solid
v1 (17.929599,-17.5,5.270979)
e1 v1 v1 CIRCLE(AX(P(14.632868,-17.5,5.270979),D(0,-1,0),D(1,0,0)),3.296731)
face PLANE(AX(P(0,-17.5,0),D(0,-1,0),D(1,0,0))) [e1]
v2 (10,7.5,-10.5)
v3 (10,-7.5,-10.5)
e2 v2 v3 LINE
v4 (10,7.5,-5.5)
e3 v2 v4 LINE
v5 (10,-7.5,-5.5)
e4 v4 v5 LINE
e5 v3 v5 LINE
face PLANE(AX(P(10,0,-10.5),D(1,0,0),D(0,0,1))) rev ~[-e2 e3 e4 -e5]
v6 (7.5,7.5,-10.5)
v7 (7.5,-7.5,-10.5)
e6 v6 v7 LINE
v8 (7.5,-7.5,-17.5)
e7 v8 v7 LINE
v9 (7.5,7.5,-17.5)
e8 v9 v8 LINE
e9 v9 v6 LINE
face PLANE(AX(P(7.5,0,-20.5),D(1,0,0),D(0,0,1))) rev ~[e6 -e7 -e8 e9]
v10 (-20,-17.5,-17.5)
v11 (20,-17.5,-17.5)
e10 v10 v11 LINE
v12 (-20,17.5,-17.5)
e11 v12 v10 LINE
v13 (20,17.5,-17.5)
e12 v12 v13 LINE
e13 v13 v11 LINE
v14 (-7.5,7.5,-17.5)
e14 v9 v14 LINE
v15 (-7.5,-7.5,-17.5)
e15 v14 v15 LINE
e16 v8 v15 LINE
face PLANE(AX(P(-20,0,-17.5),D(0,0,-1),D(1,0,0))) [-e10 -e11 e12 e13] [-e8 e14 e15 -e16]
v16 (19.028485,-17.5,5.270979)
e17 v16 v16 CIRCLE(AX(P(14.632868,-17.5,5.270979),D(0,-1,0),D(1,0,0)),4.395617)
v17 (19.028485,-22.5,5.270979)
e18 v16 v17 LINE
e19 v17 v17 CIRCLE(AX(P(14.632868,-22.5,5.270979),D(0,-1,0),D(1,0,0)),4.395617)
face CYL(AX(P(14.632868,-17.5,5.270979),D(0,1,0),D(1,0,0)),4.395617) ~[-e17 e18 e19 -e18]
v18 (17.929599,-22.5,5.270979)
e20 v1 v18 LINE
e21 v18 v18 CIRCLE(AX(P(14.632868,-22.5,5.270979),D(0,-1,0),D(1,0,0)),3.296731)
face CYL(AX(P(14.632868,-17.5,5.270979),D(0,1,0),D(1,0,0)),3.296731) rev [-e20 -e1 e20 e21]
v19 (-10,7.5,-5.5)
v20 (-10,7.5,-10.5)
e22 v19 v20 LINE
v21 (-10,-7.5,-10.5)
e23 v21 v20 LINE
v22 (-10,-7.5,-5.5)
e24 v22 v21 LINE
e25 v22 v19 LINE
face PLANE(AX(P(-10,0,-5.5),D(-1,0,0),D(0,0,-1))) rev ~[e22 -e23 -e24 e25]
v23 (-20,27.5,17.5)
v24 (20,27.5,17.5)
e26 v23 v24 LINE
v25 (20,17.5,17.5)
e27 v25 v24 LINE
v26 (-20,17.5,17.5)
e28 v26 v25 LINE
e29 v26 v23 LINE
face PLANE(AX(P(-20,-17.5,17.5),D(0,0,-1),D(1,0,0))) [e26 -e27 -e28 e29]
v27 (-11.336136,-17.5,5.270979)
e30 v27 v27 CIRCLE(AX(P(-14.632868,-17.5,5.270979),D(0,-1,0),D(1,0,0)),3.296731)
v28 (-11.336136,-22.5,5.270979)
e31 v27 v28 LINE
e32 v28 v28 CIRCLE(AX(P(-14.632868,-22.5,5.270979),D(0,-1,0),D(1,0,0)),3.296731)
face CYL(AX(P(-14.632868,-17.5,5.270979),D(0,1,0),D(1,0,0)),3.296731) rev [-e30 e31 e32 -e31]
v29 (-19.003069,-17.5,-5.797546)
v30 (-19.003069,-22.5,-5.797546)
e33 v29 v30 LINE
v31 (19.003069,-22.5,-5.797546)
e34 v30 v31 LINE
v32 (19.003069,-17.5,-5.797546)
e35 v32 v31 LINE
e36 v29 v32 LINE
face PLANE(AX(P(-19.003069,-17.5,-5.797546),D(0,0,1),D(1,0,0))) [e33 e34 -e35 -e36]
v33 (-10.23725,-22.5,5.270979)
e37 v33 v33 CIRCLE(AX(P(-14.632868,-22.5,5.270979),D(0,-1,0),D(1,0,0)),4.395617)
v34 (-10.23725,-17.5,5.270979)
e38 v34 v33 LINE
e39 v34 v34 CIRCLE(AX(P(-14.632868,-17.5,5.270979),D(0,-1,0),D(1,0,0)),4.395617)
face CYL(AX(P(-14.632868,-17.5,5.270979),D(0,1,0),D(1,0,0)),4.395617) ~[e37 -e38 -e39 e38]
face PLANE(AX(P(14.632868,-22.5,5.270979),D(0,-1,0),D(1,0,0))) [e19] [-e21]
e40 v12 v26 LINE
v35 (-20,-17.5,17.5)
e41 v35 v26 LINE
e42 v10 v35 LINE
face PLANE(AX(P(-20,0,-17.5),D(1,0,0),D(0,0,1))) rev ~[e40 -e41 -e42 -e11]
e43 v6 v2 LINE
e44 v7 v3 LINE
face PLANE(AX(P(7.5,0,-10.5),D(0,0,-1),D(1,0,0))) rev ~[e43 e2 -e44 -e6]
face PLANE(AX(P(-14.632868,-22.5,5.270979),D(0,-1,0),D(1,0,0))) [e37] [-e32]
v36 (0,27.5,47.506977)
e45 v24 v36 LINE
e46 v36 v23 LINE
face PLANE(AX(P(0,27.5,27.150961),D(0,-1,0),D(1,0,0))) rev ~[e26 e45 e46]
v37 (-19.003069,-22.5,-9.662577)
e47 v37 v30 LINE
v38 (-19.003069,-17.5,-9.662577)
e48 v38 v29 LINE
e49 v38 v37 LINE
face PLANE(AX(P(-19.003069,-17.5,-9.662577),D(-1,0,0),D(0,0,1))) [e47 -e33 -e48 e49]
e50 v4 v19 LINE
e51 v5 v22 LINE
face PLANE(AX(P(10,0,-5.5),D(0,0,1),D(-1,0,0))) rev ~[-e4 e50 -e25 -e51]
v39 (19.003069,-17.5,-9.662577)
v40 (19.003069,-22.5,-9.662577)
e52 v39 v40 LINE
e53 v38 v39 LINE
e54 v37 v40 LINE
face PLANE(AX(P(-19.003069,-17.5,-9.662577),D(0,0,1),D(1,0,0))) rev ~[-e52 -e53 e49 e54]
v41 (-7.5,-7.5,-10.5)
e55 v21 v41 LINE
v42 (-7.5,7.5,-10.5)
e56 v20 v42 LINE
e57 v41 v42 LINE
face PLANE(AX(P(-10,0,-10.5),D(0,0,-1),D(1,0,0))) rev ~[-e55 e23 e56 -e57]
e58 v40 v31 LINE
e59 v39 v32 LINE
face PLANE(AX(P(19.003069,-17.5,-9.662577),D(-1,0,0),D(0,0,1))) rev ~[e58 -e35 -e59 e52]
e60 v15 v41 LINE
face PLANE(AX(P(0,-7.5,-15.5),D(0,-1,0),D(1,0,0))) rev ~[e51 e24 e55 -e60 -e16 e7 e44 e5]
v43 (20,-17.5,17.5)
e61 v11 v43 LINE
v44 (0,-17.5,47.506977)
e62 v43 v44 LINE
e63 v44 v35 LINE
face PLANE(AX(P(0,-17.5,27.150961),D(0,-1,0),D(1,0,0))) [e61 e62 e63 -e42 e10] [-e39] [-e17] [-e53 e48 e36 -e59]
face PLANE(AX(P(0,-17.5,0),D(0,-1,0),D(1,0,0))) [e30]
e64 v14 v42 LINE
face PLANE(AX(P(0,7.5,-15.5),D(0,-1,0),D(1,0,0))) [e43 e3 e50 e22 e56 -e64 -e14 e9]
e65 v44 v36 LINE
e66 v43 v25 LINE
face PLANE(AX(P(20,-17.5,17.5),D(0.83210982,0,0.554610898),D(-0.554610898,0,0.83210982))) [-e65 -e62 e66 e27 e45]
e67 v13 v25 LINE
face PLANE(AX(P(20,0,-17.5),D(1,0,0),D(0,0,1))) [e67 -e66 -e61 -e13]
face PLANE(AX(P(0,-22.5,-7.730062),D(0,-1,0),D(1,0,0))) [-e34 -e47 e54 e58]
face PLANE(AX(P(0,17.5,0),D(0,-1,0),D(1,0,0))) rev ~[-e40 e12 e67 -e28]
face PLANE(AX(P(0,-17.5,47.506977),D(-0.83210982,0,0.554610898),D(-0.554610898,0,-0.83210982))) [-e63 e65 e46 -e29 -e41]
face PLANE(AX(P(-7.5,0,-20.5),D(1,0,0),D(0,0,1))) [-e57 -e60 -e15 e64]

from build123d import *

# Parameters (mm, degrees)
F0_W     = 40
F0_H     = 35
F1_DEPTH = 17.5
F2_W     = 15
F2_H     = 10
F3_DEPTH = 7.5
F4_R     = 4.3956172523
F4_R_2   = 3.2967313173
F4_W     = 38.0061380565
F4_H     = 3.8650305942
F5_DEPTH = 5
F9_DEPTH = 45


# Not quite as in the source:
# - the program builds the solid bodies; features that only make, move or delete a surface that nothing else refers to are left out


with BuildPart() as f1:
    # F0 (on Front) → F1 (new body, symmetric)
    with BuildSketch(Plane.XZ):
        Rectangle(F0_W, F0_H)
    extrude(amount=F1_DEPTH, both=True)

    # F2 (on Front) → F3 (cut, symmetric)
    with BuildSketch(Plane.XZ):
        with Locations((0, -15.5)):
            Rectangle(F2_W, F2_H)
        Polygon((-7.5, -10.5), (7.5, -10.5), (10, -10.5), (10, -5.5), (-10, -5.5), (-10, -10.5), align=None)
    extrude(amount=F3_DEPTH, both=True, mode=Mode.SUBTRACT)

    # F4 (on face) → F5 (join)
    with BuildSketch(Plane.XZ.offset(17.5)):
        with Locations((-14.6328676492, 5.2709789015)):
            Circle(F4_R)
        with Locations((-14.6328676492, 5.2709789015)):
            Circle(F4_R_2, mode=Mode.SUBTRACT)
        with Locations((14.6328676492, 5.2709789015)):
            Circle(F4_R)
        with Locations((14.6328676492, 5.2709789015)):
            Circle(F4_R_2, mode=Mode.SUBTRACT)
        with Locations((0, -7.730061654)):
            Rectangle(F4_W, F4_H)
    extrude(amount=F5_DEPTH)

    # F4 (on face) → F9 (join)
    with BuildSketch(Plane.XZ.offset(17.5)):
        Polygon((0, 47.5069768727), (-20, 17.5), (20, 17.5), align=None)
    extrude(amount=-F9_DEPTH)


solid = f1.part
